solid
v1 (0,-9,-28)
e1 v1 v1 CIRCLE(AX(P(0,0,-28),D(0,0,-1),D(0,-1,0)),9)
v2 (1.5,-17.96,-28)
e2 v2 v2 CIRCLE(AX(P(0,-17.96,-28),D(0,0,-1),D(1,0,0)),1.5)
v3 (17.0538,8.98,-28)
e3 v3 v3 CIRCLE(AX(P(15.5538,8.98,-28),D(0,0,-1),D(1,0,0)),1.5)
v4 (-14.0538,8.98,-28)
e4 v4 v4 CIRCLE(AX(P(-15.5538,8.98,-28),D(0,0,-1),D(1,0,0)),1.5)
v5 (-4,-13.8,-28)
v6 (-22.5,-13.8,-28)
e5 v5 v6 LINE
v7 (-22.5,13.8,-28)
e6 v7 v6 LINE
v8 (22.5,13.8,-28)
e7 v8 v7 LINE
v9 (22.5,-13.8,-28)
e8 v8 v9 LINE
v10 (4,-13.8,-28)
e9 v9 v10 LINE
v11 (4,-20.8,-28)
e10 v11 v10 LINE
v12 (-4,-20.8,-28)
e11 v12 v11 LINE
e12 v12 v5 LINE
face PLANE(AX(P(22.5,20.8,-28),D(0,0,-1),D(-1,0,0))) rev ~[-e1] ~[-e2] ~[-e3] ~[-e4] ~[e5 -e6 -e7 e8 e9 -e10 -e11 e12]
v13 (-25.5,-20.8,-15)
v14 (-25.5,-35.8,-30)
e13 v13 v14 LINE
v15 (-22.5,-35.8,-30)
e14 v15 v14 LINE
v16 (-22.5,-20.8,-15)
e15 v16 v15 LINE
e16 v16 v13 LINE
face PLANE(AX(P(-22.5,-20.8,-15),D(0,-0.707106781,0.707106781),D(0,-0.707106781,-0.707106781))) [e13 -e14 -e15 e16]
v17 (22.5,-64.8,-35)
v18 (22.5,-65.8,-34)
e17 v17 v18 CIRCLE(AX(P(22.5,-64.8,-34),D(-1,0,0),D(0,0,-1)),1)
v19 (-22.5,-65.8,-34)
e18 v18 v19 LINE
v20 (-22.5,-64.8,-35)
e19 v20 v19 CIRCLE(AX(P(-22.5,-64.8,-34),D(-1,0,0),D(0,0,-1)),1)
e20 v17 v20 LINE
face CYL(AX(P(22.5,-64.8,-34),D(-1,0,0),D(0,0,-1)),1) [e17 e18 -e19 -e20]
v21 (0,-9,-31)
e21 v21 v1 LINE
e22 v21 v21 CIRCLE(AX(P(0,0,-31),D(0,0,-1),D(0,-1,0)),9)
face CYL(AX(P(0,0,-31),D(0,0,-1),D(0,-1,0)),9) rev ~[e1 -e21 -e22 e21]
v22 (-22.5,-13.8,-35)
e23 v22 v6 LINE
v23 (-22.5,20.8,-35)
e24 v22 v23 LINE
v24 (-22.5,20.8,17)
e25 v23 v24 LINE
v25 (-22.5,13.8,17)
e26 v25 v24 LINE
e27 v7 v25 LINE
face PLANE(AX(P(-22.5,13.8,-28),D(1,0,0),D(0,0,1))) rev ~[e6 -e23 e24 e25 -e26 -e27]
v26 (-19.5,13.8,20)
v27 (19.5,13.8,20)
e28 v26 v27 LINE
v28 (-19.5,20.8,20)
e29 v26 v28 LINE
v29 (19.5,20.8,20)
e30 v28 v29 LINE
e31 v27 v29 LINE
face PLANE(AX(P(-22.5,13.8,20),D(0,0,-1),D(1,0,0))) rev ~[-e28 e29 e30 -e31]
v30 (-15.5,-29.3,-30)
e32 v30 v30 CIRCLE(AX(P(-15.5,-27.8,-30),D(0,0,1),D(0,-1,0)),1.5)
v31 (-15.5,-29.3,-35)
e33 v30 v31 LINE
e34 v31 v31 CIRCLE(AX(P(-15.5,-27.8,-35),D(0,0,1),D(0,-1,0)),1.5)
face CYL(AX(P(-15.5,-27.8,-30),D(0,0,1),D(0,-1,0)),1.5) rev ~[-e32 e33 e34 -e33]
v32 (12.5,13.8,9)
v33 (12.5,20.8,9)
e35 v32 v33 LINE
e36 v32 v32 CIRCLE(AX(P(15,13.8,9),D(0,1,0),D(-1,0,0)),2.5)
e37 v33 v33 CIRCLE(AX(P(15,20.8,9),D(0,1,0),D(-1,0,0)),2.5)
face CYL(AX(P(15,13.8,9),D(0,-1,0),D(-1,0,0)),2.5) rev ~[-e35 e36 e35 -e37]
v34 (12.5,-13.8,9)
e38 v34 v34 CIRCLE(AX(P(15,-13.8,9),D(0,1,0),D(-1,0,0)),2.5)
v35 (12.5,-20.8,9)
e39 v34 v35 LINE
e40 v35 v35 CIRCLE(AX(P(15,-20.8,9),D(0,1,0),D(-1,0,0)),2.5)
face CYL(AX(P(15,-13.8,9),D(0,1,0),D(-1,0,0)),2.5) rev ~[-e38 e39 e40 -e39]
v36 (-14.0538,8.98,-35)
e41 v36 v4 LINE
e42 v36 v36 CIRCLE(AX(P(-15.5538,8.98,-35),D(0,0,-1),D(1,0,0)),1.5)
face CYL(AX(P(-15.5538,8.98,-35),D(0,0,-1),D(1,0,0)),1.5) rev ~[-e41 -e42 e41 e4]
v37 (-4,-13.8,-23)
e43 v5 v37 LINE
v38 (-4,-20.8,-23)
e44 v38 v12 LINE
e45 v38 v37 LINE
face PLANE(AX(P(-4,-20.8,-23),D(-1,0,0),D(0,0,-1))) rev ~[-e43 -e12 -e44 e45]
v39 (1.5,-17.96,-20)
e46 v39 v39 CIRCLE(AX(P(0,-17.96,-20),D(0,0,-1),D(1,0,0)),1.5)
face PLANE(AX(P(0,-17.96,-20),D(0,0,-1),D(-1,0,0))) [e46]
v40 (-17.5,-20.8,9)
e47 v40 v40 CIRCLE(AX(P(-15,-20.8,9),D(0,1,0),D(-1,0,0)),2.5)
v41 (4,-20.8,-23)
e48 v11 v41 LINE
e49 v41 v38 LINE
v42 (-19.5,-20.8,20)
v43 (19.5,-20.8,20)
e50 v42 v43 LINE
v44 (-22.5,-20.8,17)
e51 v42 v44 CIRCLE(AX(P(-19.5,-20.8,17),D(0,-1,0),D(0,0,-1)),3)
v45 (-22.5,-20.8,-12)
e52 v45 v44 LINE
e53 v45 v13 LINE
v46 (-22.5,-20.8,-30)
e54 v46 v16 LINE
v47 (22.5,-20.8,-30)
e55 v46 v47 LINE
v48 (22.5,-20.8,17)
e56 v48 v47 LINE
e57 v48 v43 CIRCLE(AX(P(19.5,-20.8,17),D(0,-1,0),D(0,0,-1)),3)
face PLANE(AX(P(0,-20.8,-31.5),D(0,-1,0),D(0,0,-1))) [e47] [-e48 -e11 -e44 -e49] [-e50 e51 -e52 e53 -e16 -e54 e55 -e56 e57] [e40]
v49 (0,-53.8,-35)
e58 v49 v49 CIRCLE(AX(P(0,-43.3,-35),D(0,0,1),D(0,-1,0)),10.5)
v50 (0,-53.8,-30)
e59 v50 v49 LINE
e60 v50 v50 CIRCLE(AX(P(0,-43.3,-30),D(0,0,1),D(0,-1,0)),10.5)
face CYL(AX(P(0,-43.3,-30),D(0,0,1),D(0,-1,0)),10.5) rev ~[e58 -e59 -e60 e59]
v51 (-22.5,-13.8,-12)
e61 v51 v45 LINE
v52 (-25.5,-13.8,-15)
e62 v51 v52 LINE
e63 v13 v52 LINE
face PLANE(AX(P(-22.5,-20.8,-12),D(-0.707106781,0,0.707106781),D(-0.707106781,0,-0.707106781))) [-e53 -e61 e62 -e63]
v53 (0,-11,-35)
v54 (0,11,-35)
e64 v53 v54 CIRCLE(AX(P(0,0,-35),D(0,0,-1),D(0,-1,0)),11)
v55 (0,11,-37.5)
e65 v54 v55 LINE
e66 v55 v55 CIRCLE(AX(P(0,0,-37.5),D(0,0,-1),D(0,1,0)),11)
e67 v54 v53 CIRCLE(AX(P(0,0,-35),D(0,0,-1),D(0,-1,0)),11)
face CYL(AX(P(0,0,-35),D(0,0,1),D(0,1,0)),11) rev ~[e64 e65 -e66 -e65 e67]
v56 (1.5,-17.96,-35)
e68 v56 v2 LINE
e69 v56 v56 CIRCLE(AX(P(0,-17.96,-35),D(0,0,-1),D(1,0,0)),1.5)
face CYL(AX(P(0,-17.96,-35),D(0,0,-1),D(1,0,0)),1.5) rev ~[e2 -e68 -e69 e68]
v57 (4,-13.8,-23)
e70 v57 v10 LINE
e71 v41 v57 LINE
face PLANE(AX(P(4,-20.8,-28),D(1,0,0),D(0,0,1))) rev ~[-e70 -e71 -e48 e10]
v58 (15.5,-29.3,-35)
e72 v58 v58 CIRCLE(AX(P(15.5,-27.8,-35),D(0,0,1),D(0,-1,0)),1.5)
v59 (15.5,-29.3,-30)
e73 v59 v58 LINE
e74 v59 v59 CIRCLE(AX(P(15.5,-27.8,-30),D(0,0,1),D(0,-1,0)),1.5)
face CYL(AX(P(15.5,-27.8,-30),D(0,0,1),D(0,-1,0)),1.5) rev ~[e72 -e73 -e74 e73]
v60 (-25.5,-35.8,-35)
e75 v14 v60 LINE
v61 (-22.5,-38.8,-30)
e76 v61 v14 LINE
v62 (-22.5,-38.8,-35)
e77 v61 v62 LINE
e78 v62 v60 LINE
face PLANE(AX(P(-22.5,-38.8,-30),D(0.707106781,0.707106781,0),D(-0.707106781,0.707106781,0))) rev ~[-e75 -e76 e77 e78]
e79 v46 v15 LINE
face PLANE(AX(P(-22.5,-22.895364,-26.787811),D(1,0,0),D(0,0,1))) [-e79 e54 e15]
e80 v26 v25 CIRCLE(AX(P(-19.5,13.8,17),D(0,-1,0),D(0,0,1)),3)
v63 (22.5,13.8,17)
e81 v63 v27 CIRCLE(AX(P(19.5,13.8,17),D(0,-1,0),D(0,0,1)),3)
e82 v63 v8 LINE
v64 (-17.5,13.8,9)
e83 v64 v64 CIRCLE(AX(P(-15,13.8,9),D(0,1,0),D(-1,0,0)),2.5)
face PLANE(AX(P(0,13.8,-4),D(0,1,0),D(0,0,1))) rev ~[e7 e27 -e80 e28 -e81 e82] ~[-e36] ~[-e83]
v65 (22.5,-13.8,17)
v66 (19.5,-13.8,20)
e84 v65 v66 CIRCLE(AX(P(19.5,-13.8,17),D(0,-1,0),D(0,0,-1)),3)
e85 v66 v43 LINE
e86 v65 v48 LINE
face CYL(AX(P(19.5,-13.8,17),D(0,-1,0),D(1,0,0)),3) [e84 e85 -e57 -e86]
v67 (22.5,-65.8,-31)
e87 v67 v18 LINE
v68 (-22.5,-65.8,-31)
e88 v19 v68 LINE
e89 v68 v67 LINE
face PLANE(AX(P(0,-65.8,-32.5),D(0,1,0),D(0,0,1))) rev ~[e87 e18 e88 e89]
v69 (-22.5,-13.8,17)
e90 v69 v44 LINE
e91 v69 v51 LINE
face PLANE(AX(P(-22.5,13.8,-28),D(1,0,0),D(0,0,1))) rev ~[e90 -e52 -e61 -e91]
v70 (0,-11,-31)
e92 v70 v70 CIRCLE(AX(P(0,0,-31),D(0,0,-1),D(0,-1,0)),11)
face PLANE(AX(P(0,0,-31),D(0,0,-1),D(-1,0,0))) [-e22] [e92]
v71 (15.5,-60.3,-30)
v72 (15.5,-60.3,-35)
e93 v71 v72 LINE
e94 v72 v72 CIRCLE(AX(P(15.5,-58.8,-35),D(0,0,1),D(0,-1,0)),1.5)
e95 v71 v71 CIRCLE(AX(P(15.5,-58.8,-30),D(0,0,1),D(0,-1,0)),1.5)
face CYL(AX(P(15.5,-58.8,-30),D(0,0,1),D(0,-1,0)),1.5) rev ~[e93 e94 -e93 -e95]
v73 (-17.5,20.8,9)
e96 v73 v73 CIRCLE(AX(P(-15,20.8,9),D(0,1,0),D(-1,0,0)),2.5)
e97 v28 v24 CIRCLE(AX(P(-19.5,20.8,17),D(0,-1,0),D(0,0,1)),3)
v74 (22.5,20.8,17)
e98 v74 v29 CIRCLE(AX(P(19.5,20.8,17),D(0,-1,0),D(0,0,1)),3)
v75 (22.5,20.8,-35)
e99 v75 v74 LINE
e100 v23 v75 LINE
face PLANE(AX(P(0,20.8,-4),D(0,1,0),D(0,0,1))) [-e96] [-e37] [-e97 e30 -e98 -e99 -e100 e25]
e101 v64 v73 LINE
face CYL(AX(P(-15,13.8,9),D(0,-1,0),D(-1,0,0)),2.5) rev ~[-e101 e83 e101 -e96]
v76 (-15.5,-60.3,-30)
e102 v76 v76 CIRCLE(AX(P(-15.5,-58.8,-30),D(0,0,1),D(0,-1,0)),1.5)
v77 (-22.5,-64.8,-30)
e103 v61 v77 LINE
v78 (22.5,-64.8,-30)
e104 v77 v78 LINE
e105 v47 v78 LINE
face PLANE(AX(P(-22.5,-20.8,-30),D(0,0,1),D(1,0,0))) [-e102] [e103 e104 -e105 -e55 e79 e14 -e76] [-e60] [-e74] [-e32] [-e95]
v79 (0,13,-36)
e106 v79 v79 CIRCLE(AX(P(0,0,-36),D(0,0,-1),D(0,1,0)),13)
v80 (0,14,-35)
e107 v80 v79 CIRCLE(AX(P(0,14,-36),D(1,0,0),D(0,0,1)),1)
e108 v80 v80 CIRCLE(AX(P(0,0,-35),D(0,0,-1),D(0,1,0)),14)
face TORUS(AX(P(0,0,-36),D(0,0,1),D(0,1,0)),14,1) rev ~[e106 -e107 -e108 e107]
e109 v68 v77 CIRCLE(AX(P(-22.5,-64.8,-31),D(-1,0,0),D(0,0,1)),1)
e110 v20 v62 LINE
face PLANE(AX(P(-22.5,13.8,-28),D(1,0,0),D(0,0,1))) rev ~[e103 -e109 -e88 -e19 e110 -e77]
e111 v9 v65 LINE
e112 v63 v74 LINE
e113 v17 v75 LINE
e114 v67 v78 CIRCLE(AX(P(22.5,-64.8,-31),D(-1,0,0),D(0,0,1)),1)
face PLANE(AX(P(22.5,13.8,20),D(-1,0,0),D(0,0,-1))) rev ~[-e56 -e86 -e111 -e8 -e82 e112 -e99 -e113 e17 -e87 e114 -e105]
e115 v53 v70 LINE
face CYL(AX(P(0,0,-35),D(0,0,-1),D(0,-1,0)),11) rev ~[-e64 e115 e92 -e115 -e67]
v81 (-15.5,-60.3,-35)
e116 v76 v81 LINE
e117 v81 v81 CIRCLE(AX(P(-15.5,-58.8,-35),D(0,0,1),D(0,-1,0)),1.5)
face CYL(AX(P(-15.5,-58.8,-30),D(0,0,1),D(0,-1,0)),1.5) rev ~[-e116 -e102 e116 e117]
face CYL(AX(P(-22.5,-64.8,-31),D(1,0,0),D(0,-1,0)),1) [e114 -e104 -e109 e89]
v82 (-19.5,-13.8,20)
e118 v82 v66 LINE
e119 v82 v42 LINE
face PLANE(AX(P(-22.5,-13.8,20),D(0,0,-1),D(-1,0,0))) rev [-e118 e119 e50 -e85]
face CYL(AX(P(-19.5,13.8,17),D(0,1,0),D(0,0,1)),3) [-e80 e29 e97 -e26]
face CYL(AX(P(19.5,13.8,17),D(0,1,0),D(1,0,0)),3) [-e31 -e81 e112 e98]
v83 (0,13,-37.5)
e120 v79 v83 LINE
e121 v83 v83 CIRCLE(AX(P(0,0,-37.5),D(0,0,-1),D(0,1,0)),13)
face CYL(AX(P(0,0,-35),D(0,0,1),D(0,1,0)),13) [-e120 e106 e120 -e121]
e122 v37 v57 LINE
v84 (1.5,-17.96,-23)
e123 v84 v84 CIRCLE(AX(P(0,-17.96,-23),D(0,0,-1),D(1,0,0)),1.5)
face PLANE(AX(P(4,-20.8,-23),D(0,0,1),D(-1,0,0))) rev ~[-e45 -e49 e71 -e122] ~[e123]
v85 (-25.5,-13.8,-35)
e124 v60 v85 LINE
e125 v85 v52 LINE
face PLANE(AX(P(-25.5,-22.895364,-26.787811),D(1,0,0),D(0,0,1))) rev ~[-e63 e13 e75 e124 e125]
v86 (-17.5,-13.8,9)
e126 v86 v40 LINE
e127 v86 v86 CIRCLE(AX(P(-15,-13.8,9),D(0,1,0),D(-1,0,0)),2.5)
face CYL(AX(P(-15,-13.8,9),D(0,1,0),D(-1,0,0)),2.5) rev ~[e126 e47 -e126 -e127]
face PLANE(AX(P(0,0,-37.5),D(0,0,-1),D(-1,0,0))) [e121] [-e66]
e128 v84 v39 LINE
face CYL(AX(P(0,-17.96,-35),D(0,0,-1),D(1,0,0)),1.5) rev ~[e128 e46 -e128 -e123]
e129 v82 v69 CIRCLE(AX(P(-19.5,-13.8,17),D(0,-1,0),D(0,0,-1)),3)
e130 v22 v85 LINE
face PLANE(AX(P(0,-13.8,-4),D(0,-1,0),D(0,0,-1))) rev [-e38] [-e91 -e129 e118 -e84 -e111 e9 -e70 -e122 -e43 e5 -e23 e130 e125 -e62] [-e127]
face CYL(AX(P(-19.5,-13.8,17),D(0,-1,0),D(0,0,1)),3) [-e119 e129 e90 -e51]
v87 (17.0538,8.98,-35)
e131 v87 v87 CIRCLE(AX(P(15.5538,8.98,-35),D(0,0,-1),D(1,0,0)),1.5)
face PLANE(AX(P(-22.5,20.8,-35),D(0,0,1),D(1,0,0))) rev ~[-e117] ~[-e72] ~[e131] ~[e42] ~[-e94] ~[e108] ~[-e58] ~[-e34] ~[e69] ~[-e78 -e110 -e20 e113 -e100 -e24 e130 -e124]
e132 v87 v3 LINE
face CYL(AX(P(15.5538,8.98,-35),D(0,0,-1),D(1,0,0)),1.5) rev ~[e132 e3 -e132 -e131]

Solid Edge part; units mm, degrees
sketch "Sketch1" plane through (0, 13.8, 0) normal (0, 1, 0) x (-1, 0, 0)
  line L0 (-22.5, 20) -> (-22.5, -20)
  line L1 (-22.5, -20) -> (-22.5, -28)
  line L2 (-22.5, -28) -> (22.5, -28)
  line L3 (22.5, -28) -> (22.5, -20)
  line L4 (22.5, -20) -> (22.5, 20)
  line L5 (22.5, 20) -> (-22.5, 20)
  circle A0 centre (-15, 9) radius 2.5
  circle A1 centre (15, 9) radius 2.5
extrude "ExtrudedProtrusion_1" add sketch "Sketch1" along normal blind 7
mirror "Mirror1" about plane through (0, 0, 0) normal (0, -1, 0) of "ExtrudedProtrusion_1"
sketch "Sketch2" plane through (0, 20.8, -4) normal (0, 1, 0) x (-1, 0, 0)
  line L0 (-22.5, -24) -> (22.5, -24)
  line L1 (22.5, -24) -> (22.5, -31)
  line L2 (22.5, -31) -> (-22.5, -31)
  line L3 (-22.5, -31) -> (-22.5, -24)
extrude "ExtrudedProtrusion_3" add sketch "Sketch2" against normal blind 41.6
sketch "Sketch3" plane through (0, 0, -35) normal (0, 0, -1) x (1, 0, 0)
  circle A0 centre (0, 0) radius 2.5
extrude "ExtrudedCutout_1" cut sketch "Sketch3" against normal blind 32
fillet "Round_2" radius 3 4 edges at (22.5, -17.3, 20) (-22.5, -17.3, 20) (22.5, 17.3, 20) (-22.5, 17.3, 20)
sketch "Sketch4" plane through (0, -20.8, -7.5) normal (0, -1, 0) x (-1, 0, 0)
  line L0 (-22.5, 27.5) -> (22.5, 27.5)
  line L1 (22.5, 27.5) -> (22.5, 22.5)
  line L2 (22.5, 22.5) -> (-22.5, 22.5)
  line L3 (-22.5, 22.5) -> (-22.5, 27.5)
extrude "ExtrudedProtrusion_4" add sketch "Sketch4" along normal blind 45
sketch "Sketch5" plane through (0, -43.3, -30) normal (0, 0, 1) x (0, -1, 0)
  circle A0 centre (0, 0) radius 10.5
  circle A1 centre (-15.5, 15.5) radius 1.5
  circle A2 centre (15.5, 15.5) radius 1.5
  circle A3 centre (15.5, -15.5) radius 1.5
  circle A4 centre (-15.5, -15.5) radius 1.5
extrude "ExtrudedCutout_2" cut sketch "Sketch5" against normal blind 29.9875
fillet "Round_3" radius 1 2 edges at (0, -65.8, -30) (0, -65.8, -35)
sketch "Sketch6" plane through (0, -22, -35) normal (0, 0, -1) x (0, -1, 0)
  circle A0 centre (-22, 0) radius 11
extrude "ExtrudedCutout_3" cut sketch "Sketch6" against normal blind 4
sketch "Sketch7" plane through (0, 0, -31) normal (0, 0, -1) x (0, -1, 0)
  circle A0 centre (0, 0) radius 9
extrude "ExtrudedCutout_4" cut sketch "Sketch7" against normal blind 20
sketch "Sketch8" plane through (0, -22, -35) normal (0, 0, -1) x (1, 0, 0)
  circle A0 centre (0, -4.04) radius 1.5
  circle A1 centre (-15.5538, -30.98) radius 1.5
  circle A2 centre (15.5538, -30.98) radius 1.5
extrude "ExtrudedCutout_5" cut sketch "Sketch8" against normal blind 15
sketch "Sketch9" plane through (0, -20.8, -5) normal (0, -1, 0) x (1, 0, 0)
  line L0 (4, -23) -> (4, -18)
  line L1 (4, -18) -> (-4, -18)
  line L2 (-4, -18) -> (-4, -23)
  line L3 (-4, -23) -> (4, -23)
extrude "ExtrudedCutout_6" cut sketch "Sketch9" against normal blind 10
sketch "Sketch10" plane through (0, -22, -35) normal (0, 0, -1) x (0, 1, 0)
  circle A0 centre (22, 0) radius 11
  circle A1 centre (22, 0) radius 13
extrude "ExtrudedProtrusion_5" add sketch "Sketch10" along normal blind 2.5
fillet "Round_4" radius 1 1 edges at (0, -13, -35)
sketch "Sketch11" plane through (-22.5, -22.5, -9) normal (-1, 0, 0) x (0, 1, 0)
  line L0 (1.7, 6) -> (-13.3, 21)
  line L1 (-13.3, 21) -> (-13.3, 26)
  line L2 (-13.3, 26) -> (8.7, 26)
  line L3 (8.7, 26) -> (8.7, 6)
  line L4 (1.7, 6) -> (8.7, 6)
extrude "ExtrudedProtrusion_6" add sketch "Sketch11" along normal blind 3
chamfer "Chamfer_1" distance 3 angle 45 1 edges at (-22.5, -17.3, -15) measured on face at (-24.97, -19.7033, -15)
chamfer "Chamfer_2" distance 3 angle 45 1 edges at (-22.5, -35.8, -32.5) measured on face at (-24.97, -35.8, -30.7833)
